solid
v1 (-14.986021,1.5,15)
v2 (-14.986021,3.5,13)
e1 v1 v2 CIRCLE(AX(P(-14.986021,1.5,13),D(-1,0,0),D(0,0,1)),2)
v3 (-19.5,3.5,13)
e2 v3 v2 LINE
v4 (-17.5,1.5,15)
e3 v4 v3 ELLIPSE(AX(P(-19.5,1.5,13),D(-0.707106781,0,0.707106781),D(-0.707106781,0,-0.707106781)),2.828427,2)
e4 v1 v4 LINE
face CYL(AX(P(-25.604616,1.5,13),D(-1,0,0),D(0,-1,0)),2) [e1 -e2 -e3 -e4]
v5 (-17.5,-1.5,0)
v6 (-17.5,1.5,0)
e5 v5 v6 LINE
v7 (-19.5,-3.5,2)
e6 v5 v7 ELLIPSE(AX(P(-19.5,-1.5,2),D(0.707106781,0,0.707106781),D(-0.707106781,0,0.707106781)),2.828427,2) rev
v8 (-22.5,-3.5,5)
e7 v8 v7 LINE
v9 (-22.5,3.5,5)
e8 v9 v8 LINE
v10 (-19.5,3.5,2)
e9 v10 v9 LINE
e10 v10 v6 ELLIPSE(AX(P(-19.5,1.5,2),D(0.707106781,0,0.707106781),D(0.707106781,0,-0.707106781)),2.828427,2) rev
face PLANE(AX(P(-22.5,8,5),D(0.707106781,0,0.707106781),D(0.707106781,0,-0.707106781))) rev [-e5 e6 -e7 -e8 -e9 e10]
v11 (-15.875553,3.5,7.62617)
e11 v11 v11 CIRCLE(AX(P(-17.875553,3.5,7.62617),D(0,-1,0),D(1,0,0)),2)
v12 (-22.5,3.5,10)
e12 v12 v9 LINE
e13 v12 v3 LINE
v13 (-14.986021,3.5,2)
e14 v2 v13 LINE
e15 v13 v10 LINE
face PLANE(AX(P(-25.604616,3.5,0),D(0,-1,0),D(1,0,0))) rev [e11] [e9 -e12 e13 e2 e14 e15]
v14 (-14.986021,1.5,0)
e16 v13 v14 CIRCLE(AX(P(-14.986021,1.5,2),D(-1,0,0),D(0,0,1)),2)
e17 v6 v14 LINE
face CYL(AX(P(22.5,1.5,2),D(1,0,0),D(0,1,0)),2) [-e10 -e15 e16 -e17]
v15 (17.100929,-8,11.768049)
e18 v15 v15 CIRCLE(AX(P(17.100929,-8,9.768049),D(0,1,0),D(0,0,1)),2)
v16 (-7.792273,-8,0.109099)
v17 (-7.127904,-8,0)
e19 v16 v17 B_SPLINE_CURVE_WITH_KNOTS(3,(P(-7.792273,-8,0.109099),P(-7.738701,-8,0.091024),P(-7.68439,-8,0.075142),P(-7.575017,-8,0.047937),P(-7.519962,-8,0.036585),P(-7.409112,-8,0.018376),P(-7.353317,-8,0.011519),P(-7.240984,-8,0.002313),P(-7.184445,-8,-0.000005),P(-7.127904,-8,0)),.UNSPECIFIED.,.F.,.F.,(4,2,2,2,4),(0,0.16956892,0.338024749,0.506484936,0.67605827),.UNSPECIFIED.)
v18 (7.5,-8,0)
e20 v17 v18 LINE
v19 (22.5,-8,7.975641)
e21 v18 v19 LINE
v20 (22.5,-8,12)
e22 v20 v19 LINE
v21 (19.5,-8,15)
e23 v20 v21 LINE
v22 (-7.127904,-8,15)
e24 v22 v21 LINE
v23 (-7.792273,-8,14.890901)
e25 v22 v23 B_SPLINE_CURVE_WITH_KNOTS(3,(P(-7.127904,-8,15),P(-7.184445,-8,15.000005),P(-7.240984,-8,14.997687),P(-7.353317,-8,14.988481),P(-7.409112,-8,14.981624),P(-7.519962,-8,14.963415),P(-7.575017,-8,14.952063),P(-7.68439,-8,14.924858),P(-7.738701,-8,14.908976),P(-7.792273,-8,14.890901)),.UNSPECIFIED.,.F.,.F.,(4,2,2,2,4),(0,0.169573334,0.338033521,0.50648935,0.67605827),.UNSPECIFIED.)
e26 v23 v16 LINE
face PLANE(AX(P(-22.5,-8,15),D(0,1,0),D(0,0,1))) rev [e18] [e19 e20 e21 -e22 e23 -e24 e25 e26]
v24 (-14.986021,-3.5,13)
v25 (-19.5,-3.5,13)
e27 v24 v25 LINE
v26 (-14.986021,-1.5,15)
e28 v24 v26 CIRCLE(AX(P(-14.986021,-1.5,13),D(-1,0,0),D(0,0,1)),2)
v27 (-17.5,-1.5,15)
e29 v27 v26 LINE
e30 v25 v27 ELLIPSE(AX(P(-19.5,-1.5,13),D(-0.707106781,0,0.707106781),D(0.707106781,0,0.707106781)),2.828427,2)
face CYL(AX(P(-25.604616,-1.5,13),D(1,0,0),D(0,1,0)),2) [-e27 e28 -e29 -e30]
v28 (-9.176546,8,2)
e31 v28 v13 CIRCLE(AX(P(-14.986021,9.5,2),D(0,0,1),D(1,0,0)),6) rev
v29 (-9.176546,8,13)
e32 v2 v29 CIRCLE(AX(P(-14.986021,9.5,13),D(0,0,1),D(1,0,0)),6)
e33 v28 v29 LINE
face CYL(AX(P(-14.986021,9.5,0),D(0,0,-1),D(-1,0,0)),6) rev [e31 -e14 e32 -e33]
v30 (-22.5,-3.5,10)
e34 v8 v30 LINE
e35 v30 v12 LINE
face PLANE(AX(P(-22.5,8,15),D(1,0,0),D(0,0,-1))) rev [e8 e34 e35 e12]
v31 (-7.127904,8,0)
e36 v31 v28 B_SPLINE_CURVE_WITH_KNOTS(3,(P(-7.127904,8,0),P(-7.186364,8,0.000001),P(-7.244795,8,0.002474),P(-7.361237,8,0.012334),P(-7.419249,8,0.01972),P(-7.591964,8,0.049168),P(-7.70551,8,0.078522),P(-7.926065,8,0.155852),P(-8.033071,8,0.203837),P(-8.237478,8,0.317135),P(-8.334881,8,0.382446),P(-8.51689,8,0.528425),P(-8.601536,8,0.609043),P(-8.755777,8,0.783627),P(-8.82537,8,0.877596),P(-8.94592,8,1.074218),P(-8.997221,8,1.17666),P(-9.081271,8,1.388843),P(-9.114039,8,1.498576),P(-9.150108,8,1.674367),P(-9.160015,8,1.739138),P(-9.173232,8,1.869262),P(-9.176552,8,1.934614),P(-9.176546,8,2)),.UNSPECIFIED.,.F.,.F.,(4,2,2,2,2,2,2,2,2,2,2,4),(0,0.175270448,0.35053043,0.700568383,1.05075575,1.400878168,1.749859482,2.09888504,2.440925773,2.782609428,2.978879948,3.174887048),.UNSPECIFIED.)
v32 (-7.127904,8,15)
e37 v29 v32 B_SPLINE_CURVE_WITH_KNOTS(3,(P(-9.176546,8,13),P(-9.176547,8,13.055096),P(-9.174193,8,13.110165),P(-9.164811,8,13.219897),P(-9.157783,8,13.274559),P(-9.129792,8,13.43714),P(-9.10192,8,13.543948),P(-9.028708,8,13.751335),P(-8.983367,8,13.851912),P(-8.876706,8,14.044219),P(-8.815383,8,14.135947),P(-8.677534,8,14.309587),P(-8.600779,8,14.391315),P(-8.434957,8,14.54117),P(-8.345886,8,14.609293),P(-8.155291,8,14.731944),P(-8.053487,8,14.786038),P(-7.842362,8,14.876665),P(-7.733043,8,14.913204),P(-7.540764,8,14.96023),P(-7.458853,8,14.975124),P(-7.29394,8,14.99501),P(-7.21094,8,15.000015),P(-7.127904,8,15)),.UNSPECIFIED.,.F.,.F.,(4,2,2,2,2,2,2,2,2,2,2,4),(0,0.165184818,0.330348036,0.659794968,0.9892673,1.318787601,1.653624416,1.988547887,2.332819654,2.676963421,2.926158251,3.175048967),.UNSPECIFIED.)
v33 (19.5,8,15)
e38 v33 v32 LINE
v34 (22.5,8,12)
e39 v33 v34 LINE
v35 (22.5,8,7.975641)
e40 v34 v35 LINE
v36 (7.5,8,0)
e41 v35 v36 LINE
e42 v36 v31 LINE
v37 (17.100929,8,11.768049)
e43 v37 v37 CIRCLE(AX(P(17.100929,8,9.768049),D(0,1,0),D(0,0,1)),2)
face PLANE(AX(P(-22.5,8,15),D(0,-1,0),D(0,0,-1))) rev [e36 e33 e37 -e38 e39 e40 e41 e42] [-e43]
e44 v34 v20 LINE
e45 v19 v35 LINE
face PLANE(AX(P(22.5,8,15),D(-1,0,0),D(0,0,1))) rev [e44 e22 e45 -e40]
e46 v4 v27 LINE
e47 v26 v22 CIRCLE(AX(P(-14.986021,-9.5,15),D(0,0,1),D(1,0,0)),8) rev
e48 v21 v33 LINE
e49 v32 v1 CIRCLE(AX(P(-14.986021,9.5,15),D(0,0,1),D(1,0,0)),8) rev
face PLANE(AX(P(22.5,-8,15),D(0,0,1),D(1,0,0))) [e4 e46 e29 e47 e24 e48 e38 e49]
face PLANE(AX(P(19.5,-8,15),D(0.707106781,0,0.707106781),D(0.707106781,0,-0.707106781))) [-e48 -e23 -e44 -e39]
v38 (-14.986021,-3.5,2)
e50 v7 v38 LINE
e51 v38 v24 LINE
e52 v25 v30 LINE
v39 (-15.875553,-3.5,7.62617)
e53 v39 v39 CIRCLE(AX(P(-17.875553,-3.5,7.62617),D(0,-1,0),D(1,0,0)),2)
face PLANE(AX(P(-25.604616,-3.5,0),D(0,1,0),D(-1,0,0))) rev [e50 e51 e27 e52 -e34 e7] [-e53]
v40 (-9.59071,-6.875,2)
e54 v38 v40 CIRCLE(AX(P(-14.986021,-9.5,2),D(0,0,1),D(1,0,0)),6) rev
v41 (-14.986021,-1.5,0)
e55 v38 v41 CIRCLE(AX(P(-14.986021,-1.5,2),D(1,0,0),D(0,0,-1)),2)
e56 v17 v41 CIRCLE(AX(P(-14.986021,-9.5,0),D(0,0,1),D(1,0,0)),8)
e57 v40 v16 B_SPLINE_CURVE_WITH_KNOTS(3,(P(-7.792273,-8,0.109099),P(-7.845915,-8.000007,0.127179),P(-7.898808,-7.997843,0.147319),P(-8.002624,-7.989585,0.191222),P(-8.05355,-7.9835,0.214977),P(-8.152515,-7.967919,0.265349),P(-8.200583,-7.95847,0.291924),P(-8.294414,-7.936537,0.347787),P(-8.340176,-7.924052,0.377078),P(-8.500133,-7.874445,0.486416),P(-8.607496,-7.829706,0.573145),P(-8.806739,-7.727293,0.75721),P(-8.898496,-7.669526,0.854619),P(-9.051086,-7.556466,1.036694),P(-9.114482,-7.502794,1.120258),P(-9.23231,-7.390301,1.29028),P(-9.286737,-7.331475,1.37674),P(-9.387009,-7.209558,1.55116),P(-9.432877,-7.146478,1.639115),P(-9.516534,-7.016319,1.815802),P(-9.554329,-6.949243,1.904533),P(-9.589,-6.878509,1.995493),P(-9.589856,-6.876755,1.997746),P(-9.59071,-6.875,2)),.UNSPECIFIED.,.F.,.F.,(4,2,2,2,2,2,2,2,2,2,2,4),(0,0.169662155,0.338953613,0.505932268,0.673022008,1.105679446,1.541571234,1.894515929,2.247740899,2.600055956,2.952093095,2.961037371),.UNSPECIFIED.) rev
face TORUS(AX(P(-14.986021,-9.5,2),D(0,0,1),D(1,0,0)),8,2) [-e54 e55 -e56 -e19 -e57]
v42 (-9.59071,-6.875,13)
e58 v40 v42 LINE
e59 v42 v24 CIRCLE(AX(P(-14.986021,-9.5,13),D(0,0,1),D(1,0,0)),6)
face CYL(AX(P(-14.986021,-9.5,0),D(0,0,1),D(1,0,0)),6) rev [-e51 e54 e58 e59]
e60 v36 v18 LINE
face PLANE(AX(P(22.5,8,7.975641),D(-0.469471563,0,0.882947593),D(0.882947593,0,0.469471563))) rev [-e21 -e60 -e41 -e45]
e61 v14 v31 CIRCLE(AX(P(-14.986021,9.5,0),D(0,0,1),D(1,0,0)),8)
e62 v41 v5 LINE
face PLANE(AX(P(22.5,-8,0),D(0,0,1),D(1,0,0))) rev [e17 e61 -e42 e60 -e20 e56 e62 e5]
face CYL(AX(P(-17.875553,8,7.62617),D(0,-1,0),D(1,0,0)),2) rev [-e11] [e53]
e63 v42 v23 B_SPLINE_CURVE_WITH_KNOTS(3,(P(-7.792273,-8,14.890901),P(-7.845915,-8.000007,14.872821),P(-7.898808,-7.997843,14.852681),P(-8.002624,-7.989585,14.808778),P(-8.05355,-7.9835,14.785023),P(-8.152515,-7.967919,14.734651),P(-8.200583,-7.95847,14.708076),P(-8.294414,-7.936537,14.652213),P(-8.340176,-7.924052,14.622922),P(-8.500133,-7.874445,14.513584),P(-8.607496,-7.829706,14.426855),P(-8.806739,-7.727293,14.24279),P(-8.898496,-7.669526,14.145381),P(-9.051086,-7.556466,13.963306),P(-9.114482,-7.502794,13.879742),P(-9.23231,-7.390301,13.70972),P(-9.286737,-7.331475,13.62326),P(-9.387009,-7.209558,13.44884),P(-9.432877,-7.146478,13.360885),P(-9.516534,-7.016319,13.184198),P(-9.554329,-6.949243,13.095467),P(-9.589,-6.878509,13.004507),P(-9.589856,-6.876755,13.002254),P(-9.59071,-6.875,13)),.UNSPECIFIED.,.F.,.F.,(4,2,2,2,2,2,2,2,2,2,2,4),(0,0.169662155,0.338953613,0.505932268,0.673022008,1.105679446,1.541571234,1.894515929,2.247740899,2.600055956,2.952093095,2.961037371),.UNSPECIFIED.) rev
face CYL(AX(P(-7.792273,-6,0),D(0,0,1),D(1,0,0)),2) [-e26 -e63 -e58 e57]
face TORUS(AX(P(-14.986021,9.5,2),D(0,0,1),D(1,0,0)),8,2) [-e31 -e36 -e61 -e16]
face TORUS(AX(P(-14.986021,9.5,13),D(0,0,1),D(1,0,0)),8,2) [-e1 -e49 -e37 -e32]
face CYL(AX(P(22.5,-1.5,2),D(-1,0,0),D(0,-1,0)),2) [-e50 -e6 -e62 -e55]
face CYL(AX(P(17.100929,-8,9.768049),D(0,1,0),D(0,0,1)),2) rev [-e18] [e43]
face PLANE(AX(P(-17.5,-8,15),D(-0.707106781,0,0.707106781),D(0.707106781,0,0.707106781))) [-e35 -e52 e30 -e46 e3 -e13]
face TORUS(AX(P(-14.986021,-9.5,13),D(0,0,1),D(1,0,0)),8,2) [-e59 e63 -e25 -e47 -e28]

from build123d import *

# Parameters (mm, degrees)
SKETCH_1_W          = 45
SKETCH_1_H          = 16
EXTRUDE_1_DEPTH     = 15
SKETCH_2_W          = 16.428070739
SKETCH_2_H          = 9.700994635
CUT_EXTRUDE_2_DEPTH = 29.200177304
CHAMFER_2_SIZE      = 5
SKETCH_3_R          = 2
CUT_EXTRUDE_3_DEPTH = 30.38537051
SKETCH_4_R          = 2
CUT_EXTRUDE_1_DEPTH = 32.420534687
CHAMFER_13_SIZE     = 3
CHAMFER_14_SIZE     = 15
CHAMFER_14_SIZE2    = 7.975641475
FILLET_5_R          = 6
FILLET_6_R          = 2


with BuildPart() as part:
    # Эскиз1 → Вытянуть1 (new body)
    with BuildSketch(Plane.XY):
        Rectangle(SKETCH_1_W, SKETCH_1_H)
    extrude(amount=EXTRUDE_1_DEPTH)

    # Эскиз2 → Вытянуть2 (cut, through all)
    with BuildSketch(Plane.XY.offset(15)):
        with Locations((-17.390581002, -8.350497318)):
            Rectangle(SKETCH_2_W, SKETCH_2_H)
        with Locations((-17.390581002, 8.350497318)):
            Rectangle(SKETCH_2_W, SKETCH_2_H)
    extrude(amount=-CUT_EXTRUDE_2_DEPTH, mode=Mode.SUBTRACT)

    # Фаска2
    chamfer_2_edges = [part.edges().sort_by_distance(p)[0] for p in [
        (-22.5, 0, 0),
        (-22.5, 0, 15),
    ]]
    chamfer(chamfer_2_edges, length=CHAMFER_2_SIZE)

    # Эскиз3 → Вытянуть3 (cut, through all)
    with BuildSketch(Plane.XZ.offset(3.5)):
        with Locations((-17.875553024, 7.626170468)):
            Circle(SKETCH_3_R)
    extrude(amount=-CUT_EXTRUDE_3_DEPTH, mode=Mode.SUBTRACT)

    # Эскиз4 → Вырез-Вытянуть1 (cut, through all)
    with BuildSketch(Plane(origin=(0, 8, 0), x_dir=(1, 0, 0), z_dir=(0, 1, 0))):
        with Locations(Location((17.10092862, -9.768048927, 0), (0, 0, 270))):
            Circle(SKETCH_4_R)
    extrude(amount=-CUT_EXTRUDE_1_DEPTH, mode=Mode.SUBTRACT)

    # Фаска13
    chamfer_13_edges = [part.edges().sort_by_distance(p)[0] for p in [
        (22.5, 0, 15),
    ]]
    chamfer(chamfer_13_edges, length=CHAMFER_13_SIZE)

    # Фаска14
    chamfer_14_edges = [part.edges().sort_by_distance(p)[0] for p in [
        (22.5, 0, 0),
    ]]
    chamfer_14_side = [part.faces().sort_by_distance(p)[0] for p in [
        (4.599602818, 0, 0),
    ]]
    chamfer(chamfer_14_edges, length=CHAMFER_14_SIZE, length2=CHAMFER_14_SIZE2, reference=chamfer_14_side[0])

    # Скругление5
    # the kernel refuses this fillet: 6 mm, written as the material it adds along each edge
    with BuildSketch(Plane(origin=(-9.176545632, -3.5, 15), x_dir=(0, -1, 0), z_dir=(0, 0, -1))) as fillet_5_piece_1:
        with BuildLine():
            CenterArc((6, 5.809475019), FILLET_5_R, 180, 75.522487814)
            Line((0, 5.809475019), (-0.12, 5.809475019))
            Line((-0.12, 5.809475019), (-0.12, 0))
            Line((-0.12, 0), (0, -0.12))
            ThreePointArc((0, -0.12), (2.25, -0.12), (4.47, -0.1161895))
            Line((4.47, -0.1161895), (4.5, 0))
        make_face()
    extrude(amount=15)
    with BuildSketch(Plane(origin=(-9.176545632, 3.5, 15), x_dir=(0, 1, 0), z_dir=(0, 0, -1))) as fillet_5_piece_2:
        with BuildLine():
            CenterArc((6, -5.809475019), FILLET_5_R, 104.477512186, 75.522487814)
            Line((0, -5.809475019), (-0.12, -5.809475019))
            Line((-0.12, -5.809475019), (-0.12, 0))
            Line((-0.12, 0), (0, 0.12))
            ThreePointArc((0, 0.12), (2.25, 0.12), (4.47, 0.1161895))
            Line((4.47, 0.1161895), (4.5, 0))
        make_face()
    extrude(amount=15)

    # Скругление6
    fillet_6_edges = [part.edges().sort_by_distance(p)[0] for p in [
        (-9.176545632, -8, 7.5),
        (-16.243010326, 3.5, 0),
        (-16.243010326, 3.5, 15),
        (-16.243010326, -3.5, 0),
        (-16.243010326, -3.5, 15),
        (-11.311786037, -4.75658351, 15),
        (-11.311786037, -4.75658351, 0),
        (-11.311786037, 4.75658351, 15),
        (-11.311786037, 4.75658351, 0),
    ]]
    fillet(fillet_6_edges, radius=FILLET_6_R)


solid = part.part
